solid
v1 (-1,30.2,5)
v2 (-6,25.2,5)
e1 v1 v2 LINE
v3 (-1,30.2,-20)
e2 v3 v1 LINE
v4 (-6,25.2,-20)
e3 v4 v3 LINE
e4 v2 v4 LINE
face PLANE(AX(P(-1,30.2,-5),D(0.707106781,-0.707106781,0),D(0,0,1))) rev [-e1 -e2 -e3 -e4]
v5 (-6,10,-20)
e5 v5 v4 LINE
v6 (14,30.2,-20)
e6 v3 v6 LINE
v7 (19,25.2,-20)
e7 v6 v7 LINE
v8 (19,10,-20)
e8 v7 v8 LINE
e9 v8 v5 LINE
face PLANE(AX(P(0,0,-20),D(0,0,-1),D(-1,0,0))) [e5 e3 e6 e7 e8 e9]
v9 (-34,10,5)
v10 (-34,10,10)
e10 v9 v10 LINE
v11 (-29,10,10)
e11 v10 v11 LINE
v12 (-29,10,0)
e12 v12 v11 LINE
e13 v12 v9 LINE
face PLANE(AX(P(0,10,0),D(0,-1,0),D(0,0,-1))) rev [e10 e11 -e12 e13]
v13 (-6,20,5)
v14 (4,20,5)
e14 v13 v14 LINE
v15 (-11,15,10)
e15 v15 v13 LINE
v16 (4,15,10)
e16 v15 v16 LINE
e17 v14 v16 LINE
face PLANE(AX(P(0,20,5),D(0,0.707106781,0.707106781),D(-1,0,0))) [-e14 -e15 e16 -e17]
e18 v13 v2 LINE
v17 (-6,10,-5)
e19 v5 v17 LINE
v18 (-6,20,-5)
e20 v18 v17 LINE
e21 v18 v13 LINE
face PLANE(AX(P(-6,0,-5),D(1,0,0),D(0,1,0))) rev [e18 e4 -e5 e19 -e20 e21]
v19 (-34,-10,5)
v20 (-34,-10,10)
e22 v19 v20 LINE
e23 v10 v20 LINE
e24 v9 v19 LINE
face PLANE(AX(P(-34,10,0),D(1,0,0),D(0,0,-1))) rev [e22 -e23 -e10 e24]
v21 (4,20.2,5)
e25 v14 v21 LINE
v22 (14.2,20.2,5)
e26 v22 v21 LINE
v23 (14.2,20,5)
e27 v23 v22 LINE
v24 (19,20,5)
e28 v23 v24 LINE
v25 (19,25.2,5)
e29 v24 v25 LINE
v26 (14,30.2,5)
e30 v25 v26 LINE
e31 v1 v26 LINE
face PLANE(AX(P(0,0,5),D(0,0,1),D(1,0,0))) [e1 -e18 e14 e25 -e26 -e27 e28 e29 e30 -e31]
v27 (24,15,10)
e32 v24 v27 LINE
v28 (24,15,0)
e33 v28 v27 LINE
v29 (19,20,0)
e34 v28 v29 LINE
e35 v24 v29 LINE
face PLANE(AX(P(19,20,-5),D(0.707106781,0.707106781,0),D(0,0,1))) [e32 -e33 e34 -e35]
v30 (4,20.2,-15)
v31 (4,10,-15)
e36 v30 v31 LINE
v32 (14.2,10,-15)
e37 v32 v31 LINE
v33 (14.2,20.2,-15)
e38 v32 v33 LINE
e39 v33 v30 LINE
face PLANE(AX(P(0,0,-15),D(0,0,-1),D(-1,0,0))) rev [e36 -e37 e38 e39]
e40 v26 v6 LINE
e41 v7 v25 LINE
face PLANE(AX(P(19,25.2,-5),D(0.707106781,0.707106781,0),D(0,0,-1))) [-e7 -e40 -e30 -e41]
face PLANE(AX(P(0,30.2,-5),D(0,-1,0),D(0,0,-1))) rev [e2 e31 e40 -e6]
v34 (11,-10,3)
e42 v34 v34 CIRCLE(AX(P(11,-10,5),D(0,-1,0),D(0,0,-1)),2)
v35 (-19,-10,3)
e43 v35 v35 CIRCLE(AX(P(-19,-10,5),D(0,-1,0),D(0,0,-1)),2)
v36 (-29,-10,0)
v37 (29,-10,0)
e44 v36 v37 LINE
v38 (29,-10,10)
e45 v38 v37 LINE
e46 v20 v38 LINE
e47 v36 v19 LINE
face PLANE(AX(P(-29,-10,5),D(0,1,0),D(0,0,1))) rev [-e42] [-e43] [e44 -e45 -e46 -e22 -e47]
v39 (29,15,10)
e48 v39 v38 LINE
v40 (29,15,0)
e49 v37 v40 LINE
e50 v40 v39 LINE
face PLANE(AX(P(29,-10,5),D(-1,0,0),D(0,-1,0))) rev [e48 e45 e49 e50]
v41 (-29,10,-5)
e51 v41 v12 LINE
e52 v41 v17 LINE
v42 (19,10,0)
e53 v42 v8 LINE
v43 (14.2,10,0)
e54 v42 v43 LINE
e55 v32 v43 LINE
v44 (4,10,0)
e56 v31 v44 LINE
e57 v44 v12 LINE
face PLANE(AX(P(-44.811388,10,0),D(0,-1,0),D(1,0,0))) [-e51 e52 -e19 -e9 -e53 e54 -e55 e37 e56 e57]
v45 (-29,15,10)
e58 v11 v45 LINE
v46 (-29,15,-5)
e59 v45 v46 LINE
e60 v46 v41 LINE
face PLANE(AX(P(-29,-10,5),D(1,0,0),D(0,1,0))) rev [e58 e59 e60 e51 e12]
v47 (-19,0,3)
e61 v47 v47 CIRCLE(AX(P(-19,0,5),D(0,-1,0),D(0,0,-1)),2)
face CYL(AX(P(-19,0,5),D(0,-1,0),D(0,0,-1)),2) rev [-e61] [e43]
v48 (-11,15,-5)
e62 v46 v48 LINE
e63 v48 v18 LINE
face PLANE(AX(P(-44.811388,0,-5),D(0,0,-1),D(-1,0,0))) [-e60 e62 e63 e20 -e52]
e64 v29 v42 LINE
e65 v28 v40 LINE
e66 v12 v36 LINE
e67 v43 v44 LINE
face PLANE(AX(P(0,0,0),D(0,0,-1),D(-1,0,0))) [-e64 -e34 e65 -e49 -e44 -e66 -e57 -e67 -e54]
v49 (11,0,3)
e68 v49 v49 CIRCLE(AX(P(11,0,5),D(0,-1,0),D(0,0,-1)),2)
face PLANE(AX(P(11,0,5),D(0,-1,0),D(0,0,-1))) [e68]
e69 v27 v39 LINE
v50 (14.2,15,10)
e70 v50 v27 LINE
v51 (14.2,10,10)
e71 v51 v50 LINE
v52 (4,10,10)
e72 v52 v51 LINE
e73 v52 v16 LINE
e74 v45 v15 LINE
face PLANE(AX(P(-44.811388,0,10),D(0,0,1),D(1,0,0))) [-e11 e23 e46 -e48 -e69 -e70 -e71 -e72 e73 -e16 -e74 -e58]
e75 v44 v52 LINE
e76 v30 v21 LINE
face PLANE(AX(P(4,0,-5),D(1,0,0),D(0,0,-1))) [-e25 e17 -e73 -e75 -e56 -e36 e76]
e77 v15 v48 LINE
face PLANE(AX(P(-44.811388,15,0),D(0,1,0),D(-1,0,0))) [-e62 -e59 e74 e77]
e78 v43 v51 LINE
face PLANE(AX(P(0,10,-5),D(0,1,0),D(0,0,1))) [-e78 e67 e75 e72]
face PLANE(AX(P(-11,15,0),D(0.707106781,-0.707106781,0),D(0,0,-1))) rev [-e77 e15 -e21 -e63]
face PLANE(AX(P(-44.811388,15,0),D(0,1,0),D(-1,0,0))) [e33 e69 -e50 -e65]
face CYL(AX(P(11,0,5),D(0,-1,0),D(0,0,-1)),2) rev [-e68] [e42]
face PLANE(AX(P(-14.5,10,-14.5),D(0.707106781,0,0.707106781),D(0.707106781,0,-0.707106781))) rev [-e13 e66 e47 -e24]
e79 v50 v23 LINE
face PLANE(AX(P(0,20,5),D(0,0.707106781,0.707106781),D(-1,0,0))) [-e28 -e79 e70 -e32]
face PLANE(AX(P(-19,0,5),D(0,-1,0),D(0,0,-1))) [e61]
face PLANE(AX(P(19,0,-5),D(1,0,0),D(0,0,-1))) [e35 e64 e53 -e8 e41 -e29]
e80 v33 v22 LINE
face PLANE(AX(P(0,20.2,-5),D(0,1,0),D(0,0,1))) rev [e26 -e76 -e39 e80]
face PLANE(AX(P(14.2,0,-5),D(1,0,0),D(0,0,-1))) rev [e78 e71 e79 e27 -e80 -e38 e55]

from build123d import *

# Parameters (mm, degrees)
SZKIC1_W                        = 58
SZKIC1_H                        = 20
DODANIE_WYCI_GNI_CIE1_DEPTH     = 5
SZKIC2_W                        = 15
SZKIC2_H                        = 5
DODANIE_WYCI_GNI_CIE2_DEPTH     = 58
DODANIE_WYCI_GNI_CIE3_DEPTH     = 20
DODANIE_WYCI_GNI_CIE4_DEPTH     = 10
WYTNIJ_WYCI_GNI_CIE2_DEPTH      = 47.562216442
WYTNIJ_WYCI_GNI_CIE2_DEPTH_BACK = 47.562216442
SZKIC6_W                        = 58
SZKIC6_H                        = 5
DODANIE_WYCI_GNI_CIE5_DEPTH     = 20
SZKIC7_R                        = 2
WYTNIJ_WYCI_GNI_CIE3_DEPTH      = 10
DODANIE_WYCI_GNI_CIE8_DEPTH     = 10
SZKIC11_W                       = 10.2
SZKIC11_H                       = 10.2
DODANIE_WYCI_GNI_CIE9_DEPTH     = 5
SFAZOWANIE2_SIZE                = 5
SFAZOWANIE3_SIZE                = 5
SZKIC12_W                       = 10
SZKIC12_H                       = 20
WYTNIJ_WYCI_GNI_CIE4_DEPTH      = 10


with BuildPart() as part:
    # Szkic1 → Dodanie-wyciągnięcie1 (new body)
    with BuildSketch(Plane.XY):
        Rectangle(SZKIC1_W, SZKIC1_H)
    extrude(amount=DODANIE_WYCI_GNI_CIE1_DEPTH)

    # Szkic2 → Dodanie-wyciągnięcie2 (add)
    with BuildSketch(Plane(origin=(29, 0, 0), x_dir=(0, 0, -1), z_dir=(1, 0, 0))):
        with Locations((-2.5, 12.5)):
            Rectangle(SZKIC2_W, SZKIC2_H)
    extrude(amount=-DODANIE_WYCI_GNI_CIE2_DEPTH)

    # Szkic3 → Dodanie-wyciągnięcie3 (add)
    with BuildSketch(Plane.XZ.offset(10)):
        Polygon((-34, 5), (-29, 0), (-29, 5), (-24, 5), (-29, 10), (-34, 10), align=None)
    extrude(amount=-DODANIE_WYCI_GNI_CIE3_DEPTH)

    # Szkic5 → Dodanie-wyciągnięcie4 (add)
    with BuildSketch(Plane.XY.offset(5)):
        Polygon((14.2, 20.2), (14.2, 10), (19, 10), (19, 30.2), (-6, 30.2), (-6, 10), (4, 10), (4, 20.2), align=None)
    extrude(amount=-DODANIE_WYCI_GNI_CIE4_DEPTH)

    # Szkic5<3> → Wytnij-wyciągnięcie2 (cut, two sides: drawn at the far end of the back side and taken through both)
    with BuildSketch(Plane.XY.offset(5).offset(-WYTNIJ_WYCI_GNI_CIE2_DEPTH_BACK)):
        Polygon((4, 10), (14.2, 10), (14.2, 15), (14.2, 20.2), (4, 20.2), (4, 15), align=None)
    extrude(amount=WYTNIJ_WYCI_GNI_CIE2_DEPTH + WYTNIJ_WYCI_GNI_CIE2_DEPTH_BACK, mode=Mode.SUBTRACT)

    # Szkic6 → Dodanie-wyciągnięcie5 (add)
    with BuildSketch(Plane(origin=(0, 10, 0), x_dir=(1, 0, 0), z_dir=(0, 1, 0))):
        with Locations((0, -7.5)):
            Rectangle(SZKIC6_W, SZKIC6_H)
    extrude(amount=-DODANIE_WYCI_GNI_CIE5_DEPTH)

    # Szkic7 → Wytnij-wyciągnięcie3 (cut)
    with BuildSketch(Plane.XZ.offset(10)):
        with Locations(Location((-19, 5, 0), (0, 0, 270))):
            Circle(SZKIC7_R)
        with Locations(Location((11, 5, 0), (0, 0, 270))):
            Circle(SZKIC7_R)
    extrude(amount=-WYTNIJ_WYCI_GNI_CIE3_DEPTH, mode=Mode.SUBTRACT)

    # Szkic10 → Dodanie-wyciągnięcie8 (add)
    with BuildSketch(Plane(origin=(0, 0, -5), x_dir=(-1, 0, 0), z_dir=(0, 0, -1))):
        Polygon((6, 10), (6, 15), (6, 30.2), (-19, 30.2), (-19, 15), (-29, 15), (-29, 10), (-14.2, 10), (-14.2, 20.2), (-4, 20.2), (-4, 10), align=None)
    extrude(amount=DODANIE_WYCI_GNI_CIE8_DEPTH)

    # Szkic11 → Dodanie-wyciągnięcie9 (add)
    with BuildSketch(Plane(origin=(0, 0, -15), x_dir=(-1, 0, 0), z_dir=(0, 0, -1))):
        with Locations((-9.1, 15.1)):
            Rectangle(SZKIC11_W, SZKIC11_H)
        Polygon((-29, 10), (-14.2, 10), (-14.2, 20.2), (-4, 20.2), (-4, 10), (6, 10), (6, 30.2), (-19, 30.2), (-19, 15), (-29, 15), align=None)
    extrude(amount=DODANIE_WYCI_GNI_CIE9_DEPTH)

    # Sfazowanie2
    sfazowanie2_edges = [part.edges().sort_by_distance(p)[0] for p in [
        (-6, 30.2, -7.5),
        (19, 30.2, -7.5),
    ]]
    chamfer(sfazowanie2_edges, length=SFAZOWANIE2_SIZE)

    # Sfazowanie3
    # the kernel refuses this chamfer: 5 mm, written as the material it adds along each edge
    with BuildSketch(Plane(origin=(1.34158506, 15, 5), x_dir=(0, 0.9996219169112968, -0.027495876610586317), z_dir=(1, 0, 0))) as sfazowanie3_piece_1_section:
        Polygon((SFAZOWANIE3_SIZE * 0.999621916911, SFAZOWANIE3_SIZE * 0.0274958766106), (-SFAZOWANIE3_SIZE * 0.0274958766106, SFAZOWANIE3_SIZE * 0.999621916911), (0, 0), align=None)
    sfazowanie3_piece_1 = extrude(amount=17.65841494, mode=Mode.PRIVATE)
    sfazowanie3_piece_1 = split(sfazowanie3_piece_1, bisect_by=Plane(origin=(4, 16.652020772, 6.643171669), z_dir=(-1, 0, 0)), keep=Keep.TOP, mode=Mode.PRIVATE)
    sfazowanie3_piece_1 = split(sfazowanie3_piece_1, bisect_by=Plane(origin=(2.67079253, 16.652020772, 10), z_dir=(0, 0, -1)), keep=Keep.TOP, mode=Mode.PRIVATE)
    add(sfazowanie3_piece_1)
    with BuildSketch(Plane(origin=(14.2, 15, 5), x_dir=(0, 0.9996219169112968, -0.027495876610586317), z_dir=(1, 0, 0))) as sfazowanie3_piece_2_section:
        Polygon((SFAZOWANIE3_SIZE * 0.999621916911, SFAZOWANIE3_SIZE * 0.0274958766106), (-SFAZOWANIE3_SIZE * 0.0274958766106, SFAZOWANIE3_SIZE * 0.999621916911), (0, 0), align=None)
    sfazowanie3_piece_2 = extrude(amount=4.8, mode=Mode.PRIVATE)
    sfazowanie3_piece_2 = split(sfazowanie3_piece_2, bisect_by=Plane(origin=(16.6, 16.652020772, 10), z_dir=(0, 0, -1)), keep=Keep.TOP, mode=Mode.PRIVATE)
    add(sfazowanie3_piece_2)
    with BuildSketch(Plane(origin=(-6, 15, 5), x_dir=(0, 0.9996219169112968, -0.027495876610586317), z_dir=(1, 0, 0))) as sfazowanie3_piece_3_section:
        Polygon((SFAZOWANIE3_SIZE * 0.999621916911, SFAZOWANIE3_SIZE * 0.0274958766106), (-SFAZOWANIE3_SIZE * 0.0274958766106, SFAZOWANIE3_SIZE * 0.999621916911), (0, 0), align=None)
    sfazowanie3_piece_3 = extrude(amount=10, mode=Mode.PRIVATE)
    sfazowanie3_piece_3 = split(sfazowanie3_piece_3, bisect_by=Plane(origin=(-1, 16.652020772, 10), z_dir=(0, 0, -1)), keep=Keep.TOP, mode=Mode.PRIVATE)
    add(sfazowanie3_piece_3)
    with BuildSketch(Plane(origin=(-6, 15, 5), x_dir=(0, 0.9996219169112968, -0.027495876610586317), z_dir=(1, 0, 0))) as sfazowanie3_piece_4_section:
        Polygon((SFAZOWANIE3_SIZE * 0.999621916911, SFAZOWANIE3_SIZE * 0.0274958766106), (-SFAZOWANIE3_SIZE * 0.0274958766106, SFAZOWANIE3_SIZE * 0.999621916911), (0, 0), align=None)
    sfazowanie3_piece_4 = extrude(amount=22.85841494, mode=Mode.PRIVATE)
    sfazowanie3_piece_4 = split(sfazowanie3_piece_4, bisect_by=Plane(origin=(14.2, 16.652020772, 6.643171669), z_dir=(1, 0, 0)), keep=Keep.TOP, mode=Mode.PRIVATE)
    sfazowanie3_piece_4 = split(sfazowanie3_piece_4, bisect_by=Plane(origin=(15.52920747, 16.652020772, 10), z_dir=(0, 0, -1)), keep=Keep.TOP, mode=Mode.PRIVATE)
    add(sfazowanie3_piece_4)
    with BuildSketch(Plane(origin=(-6, 15, -5), x_dir=(0.027495876610586837, 0.9996219169112968, 0), z_dir=(0, 0, 1))) as sfazowanie3_piece_5:
        Polygon((SFAZOWANIE3_SIZE * 0.999621916911, SFAZOWANIE3_SIZE * 0.0274958766106), (-SFAZOWANIE3_SIZE * 0.0274958766106, SFAZOWANIE3_SIZE * 0.999621916911), (0, 0), align=None)
    extrude(amount=10)
    with BuildSketch(Plane(origin=(19, 15, -20), x_dir=(0.9996219169112968, -0.027495876610586664, 0), z_dir=(0, 0, 1))) as sfazowanie3_piece_6:
        Polygon((SFAZOWANIE3_SIZE * 0.999621916911, SFAZOWANIE3_SIZE * 0.0274958766106), (-SFAZOWANIE3_SIZE * 0.0274958766106, SFAZOWANIE3_SIZE * 0.999621916911), (0, 0), align=None)
    extrude(amount=25)
    with BuildSketch(Plane(origin=(14.2, 15, 5), x_dir=(0, 0.9996219169112968, -0.027495876610586317), z_dir=(1, 0, 0))) as sfazowanie3_piece_7a_section:
        Polygon((SFAZOWANIE3_SIZE * 0.999621916911, SFAZOWANIE3_SIZE * 0.0274958766106), (-SFAZOWANIE3_SIZE * 0.0274958766106, SFAZOWANIE3_SIZE * 0.999621916911), (0, 0), align=None)
    sfazowanie3_piece_7a = extrude(amount=17.65841494, mode=Mode.PRIVATE)
    sfazowanie3_piece_7a = split(sfazowanie3_piece_7a, bisect_by=Plane(origin=(19, 16.652020772, 6.643171669), z_dir=(1, 0, 0)), keep=Keep.TOP, mode=Mode.PRIVATE)
    sfazowanie3_piece_7a = split(sfazowanie3_piece_7a, bisect_by=Plane(origin=(24, 16.652020772, 10), z_dir=(0, 0, -1)), keep=Keep.TOP, mode=Mode.PRIVATE)
    sfazowanie3_piece_7a = split(sfazowanie3_piece_7a, bisect_by=Plane(origin=(29, 16.652020772, 6.643171669), z_dir=(-1, 0, 0)), keep=Keep.TOP, mode=Mode.PRIVATE)
    with BuildSketch(Plane(origin=(19, 15, -20), x_dir=(0.9996219169112968, -0.027495876610586664, 0), z_dir=(0, 0, 1))) as sfazowanie3_piece_7b_section:
        Polygon((SFAZOWANIE3_SIZE * 0.999621916911, SFAZOWANIE3_SIZE * 0.0274958766106), (-SFAZOWANIE3_SIZE * 0.0274958766106, SFAZOWANIE3_SIZE * 0.999621916911), (0, 0), align=None)
    sfazowanie3_piece_7b = extrude(amount=37.85841494, mode=Mode.PRIVATE)
    sfazowanie3_piece_7b = split(sfazowanie3_piece_7b, bisect_by=Plane(origin=(20.648968134, 16.648968134, 5), z_dir=(0, 0, 1)), keep=Keep.TOP, mode=Mode.PRIVATE)
    sfazowanie3_piece_7b = split(sfazowanie3_piece_7b, bisect_by=Plane(origin=(20.648968134, 16.648968134, 10), z_dir=(0, 0, -1)), keep=Keep.TOP, mode=Mode.PRIVATE)
    sfazowanie3_piece_7 = sfazowanie3_piece_7a & sfazowanie3_piece_7b
    add(sfazowanie3_piece_7)
    with BuildSketch(Plane(origin=(-6, 15, -5), x_dir=(0.027495876610586837, 0.9996219169112968, 0), z_dir=(0, 0, 1))) as sfazowanie3_piece_8a_section:
        Polygon((SFAZOWANIE3_SIZE * 0.999621916911, SFAZOWANIE3_SIZE * 0.0274958766106), (-SFAZOWANIE3_SIZE * 0.0274958766106, SFAZOWANIE3_SIZE * 0.999621916911), (0, 0), align=None)
    sfazowanie3_piece_8a = extrude(amount=22.85841494, mode=Mode.PRIVATE)
    sfazowanie3_piece_8a = split(sfazowanie3_piece_8a, bisect_by=Plane(origin=(-7.648968134, 16.648968134, 5), z_dir=(0, 0, 1)), keep=Keep.TOP, mode=Mode.PRIVATE)
    sfazowanie3_piece_8a = split(sfazowanie3_piece_8a, bisect_by=Plane(origin=(-7.648968134, 16.648968134, 10), z_dir=(0, 0, -1)), keep=Keep.TOP, mode=Mode.PRIVATE)
    with BuildSketch(Plane(origin=(-18.85841494, 15, 5), x_dir=(0, 0.9996219169112968, -0.027495876610586317), z_dir=(1, 0, 0))) as sfazowanie3_piece_8b_section:
        Polygon((SFAZOWANIE3_SIZE * 0.999621916911, SFAZOWANIE3_SIZE * 0.0274958766106), (-SFAZOWANIE3_SIZE * 0.0274958766106, SFAZOWANIE3_SIZE * 0.999621916911), (0, 0), align=None)
    sfazowanie3_piece_8b = extrude(amount=22.85841494, mode=Mode.PRIVATE)
    sfazowanie3_piece_8b = split(sfazowanie3_piece_8b, bisect_by=Plane(origin=(-6, 16.652020772, 6.643171669), z_dir=(-1, 0, 0)), keep=Keep.TOP, mode=Mode.PRIVATE)
    sfazowanie3_piece_8b = split(sfazowanie3_piece_8b, bisect_by=Plane(origin=(-12.42920747, 16.652020772, 10), z_dir=(0, 0, -1)), keep=Keep.TOP, mode=Mode.PRIVATE)
    sfazowanie3_piece_8 = sfazowanie3_piece_8a & sfazowanie3_piece_8b
    add(sfazowanie3_piece_8)

    # Szkic12 → Wytnij-wyciągnięcie4 (cut)
    with BuildSketch(Plane.XZ.offset(-10)):
        with Locations((24, -10)):
            Rectangle(SZKIC12_W, SZKIC12_H)
    extrude(amount=-WYTNIJ_WYCI_GNI_CIE4_DEPTH, mode=Mode.SUBTRACT)


solid = part.part
